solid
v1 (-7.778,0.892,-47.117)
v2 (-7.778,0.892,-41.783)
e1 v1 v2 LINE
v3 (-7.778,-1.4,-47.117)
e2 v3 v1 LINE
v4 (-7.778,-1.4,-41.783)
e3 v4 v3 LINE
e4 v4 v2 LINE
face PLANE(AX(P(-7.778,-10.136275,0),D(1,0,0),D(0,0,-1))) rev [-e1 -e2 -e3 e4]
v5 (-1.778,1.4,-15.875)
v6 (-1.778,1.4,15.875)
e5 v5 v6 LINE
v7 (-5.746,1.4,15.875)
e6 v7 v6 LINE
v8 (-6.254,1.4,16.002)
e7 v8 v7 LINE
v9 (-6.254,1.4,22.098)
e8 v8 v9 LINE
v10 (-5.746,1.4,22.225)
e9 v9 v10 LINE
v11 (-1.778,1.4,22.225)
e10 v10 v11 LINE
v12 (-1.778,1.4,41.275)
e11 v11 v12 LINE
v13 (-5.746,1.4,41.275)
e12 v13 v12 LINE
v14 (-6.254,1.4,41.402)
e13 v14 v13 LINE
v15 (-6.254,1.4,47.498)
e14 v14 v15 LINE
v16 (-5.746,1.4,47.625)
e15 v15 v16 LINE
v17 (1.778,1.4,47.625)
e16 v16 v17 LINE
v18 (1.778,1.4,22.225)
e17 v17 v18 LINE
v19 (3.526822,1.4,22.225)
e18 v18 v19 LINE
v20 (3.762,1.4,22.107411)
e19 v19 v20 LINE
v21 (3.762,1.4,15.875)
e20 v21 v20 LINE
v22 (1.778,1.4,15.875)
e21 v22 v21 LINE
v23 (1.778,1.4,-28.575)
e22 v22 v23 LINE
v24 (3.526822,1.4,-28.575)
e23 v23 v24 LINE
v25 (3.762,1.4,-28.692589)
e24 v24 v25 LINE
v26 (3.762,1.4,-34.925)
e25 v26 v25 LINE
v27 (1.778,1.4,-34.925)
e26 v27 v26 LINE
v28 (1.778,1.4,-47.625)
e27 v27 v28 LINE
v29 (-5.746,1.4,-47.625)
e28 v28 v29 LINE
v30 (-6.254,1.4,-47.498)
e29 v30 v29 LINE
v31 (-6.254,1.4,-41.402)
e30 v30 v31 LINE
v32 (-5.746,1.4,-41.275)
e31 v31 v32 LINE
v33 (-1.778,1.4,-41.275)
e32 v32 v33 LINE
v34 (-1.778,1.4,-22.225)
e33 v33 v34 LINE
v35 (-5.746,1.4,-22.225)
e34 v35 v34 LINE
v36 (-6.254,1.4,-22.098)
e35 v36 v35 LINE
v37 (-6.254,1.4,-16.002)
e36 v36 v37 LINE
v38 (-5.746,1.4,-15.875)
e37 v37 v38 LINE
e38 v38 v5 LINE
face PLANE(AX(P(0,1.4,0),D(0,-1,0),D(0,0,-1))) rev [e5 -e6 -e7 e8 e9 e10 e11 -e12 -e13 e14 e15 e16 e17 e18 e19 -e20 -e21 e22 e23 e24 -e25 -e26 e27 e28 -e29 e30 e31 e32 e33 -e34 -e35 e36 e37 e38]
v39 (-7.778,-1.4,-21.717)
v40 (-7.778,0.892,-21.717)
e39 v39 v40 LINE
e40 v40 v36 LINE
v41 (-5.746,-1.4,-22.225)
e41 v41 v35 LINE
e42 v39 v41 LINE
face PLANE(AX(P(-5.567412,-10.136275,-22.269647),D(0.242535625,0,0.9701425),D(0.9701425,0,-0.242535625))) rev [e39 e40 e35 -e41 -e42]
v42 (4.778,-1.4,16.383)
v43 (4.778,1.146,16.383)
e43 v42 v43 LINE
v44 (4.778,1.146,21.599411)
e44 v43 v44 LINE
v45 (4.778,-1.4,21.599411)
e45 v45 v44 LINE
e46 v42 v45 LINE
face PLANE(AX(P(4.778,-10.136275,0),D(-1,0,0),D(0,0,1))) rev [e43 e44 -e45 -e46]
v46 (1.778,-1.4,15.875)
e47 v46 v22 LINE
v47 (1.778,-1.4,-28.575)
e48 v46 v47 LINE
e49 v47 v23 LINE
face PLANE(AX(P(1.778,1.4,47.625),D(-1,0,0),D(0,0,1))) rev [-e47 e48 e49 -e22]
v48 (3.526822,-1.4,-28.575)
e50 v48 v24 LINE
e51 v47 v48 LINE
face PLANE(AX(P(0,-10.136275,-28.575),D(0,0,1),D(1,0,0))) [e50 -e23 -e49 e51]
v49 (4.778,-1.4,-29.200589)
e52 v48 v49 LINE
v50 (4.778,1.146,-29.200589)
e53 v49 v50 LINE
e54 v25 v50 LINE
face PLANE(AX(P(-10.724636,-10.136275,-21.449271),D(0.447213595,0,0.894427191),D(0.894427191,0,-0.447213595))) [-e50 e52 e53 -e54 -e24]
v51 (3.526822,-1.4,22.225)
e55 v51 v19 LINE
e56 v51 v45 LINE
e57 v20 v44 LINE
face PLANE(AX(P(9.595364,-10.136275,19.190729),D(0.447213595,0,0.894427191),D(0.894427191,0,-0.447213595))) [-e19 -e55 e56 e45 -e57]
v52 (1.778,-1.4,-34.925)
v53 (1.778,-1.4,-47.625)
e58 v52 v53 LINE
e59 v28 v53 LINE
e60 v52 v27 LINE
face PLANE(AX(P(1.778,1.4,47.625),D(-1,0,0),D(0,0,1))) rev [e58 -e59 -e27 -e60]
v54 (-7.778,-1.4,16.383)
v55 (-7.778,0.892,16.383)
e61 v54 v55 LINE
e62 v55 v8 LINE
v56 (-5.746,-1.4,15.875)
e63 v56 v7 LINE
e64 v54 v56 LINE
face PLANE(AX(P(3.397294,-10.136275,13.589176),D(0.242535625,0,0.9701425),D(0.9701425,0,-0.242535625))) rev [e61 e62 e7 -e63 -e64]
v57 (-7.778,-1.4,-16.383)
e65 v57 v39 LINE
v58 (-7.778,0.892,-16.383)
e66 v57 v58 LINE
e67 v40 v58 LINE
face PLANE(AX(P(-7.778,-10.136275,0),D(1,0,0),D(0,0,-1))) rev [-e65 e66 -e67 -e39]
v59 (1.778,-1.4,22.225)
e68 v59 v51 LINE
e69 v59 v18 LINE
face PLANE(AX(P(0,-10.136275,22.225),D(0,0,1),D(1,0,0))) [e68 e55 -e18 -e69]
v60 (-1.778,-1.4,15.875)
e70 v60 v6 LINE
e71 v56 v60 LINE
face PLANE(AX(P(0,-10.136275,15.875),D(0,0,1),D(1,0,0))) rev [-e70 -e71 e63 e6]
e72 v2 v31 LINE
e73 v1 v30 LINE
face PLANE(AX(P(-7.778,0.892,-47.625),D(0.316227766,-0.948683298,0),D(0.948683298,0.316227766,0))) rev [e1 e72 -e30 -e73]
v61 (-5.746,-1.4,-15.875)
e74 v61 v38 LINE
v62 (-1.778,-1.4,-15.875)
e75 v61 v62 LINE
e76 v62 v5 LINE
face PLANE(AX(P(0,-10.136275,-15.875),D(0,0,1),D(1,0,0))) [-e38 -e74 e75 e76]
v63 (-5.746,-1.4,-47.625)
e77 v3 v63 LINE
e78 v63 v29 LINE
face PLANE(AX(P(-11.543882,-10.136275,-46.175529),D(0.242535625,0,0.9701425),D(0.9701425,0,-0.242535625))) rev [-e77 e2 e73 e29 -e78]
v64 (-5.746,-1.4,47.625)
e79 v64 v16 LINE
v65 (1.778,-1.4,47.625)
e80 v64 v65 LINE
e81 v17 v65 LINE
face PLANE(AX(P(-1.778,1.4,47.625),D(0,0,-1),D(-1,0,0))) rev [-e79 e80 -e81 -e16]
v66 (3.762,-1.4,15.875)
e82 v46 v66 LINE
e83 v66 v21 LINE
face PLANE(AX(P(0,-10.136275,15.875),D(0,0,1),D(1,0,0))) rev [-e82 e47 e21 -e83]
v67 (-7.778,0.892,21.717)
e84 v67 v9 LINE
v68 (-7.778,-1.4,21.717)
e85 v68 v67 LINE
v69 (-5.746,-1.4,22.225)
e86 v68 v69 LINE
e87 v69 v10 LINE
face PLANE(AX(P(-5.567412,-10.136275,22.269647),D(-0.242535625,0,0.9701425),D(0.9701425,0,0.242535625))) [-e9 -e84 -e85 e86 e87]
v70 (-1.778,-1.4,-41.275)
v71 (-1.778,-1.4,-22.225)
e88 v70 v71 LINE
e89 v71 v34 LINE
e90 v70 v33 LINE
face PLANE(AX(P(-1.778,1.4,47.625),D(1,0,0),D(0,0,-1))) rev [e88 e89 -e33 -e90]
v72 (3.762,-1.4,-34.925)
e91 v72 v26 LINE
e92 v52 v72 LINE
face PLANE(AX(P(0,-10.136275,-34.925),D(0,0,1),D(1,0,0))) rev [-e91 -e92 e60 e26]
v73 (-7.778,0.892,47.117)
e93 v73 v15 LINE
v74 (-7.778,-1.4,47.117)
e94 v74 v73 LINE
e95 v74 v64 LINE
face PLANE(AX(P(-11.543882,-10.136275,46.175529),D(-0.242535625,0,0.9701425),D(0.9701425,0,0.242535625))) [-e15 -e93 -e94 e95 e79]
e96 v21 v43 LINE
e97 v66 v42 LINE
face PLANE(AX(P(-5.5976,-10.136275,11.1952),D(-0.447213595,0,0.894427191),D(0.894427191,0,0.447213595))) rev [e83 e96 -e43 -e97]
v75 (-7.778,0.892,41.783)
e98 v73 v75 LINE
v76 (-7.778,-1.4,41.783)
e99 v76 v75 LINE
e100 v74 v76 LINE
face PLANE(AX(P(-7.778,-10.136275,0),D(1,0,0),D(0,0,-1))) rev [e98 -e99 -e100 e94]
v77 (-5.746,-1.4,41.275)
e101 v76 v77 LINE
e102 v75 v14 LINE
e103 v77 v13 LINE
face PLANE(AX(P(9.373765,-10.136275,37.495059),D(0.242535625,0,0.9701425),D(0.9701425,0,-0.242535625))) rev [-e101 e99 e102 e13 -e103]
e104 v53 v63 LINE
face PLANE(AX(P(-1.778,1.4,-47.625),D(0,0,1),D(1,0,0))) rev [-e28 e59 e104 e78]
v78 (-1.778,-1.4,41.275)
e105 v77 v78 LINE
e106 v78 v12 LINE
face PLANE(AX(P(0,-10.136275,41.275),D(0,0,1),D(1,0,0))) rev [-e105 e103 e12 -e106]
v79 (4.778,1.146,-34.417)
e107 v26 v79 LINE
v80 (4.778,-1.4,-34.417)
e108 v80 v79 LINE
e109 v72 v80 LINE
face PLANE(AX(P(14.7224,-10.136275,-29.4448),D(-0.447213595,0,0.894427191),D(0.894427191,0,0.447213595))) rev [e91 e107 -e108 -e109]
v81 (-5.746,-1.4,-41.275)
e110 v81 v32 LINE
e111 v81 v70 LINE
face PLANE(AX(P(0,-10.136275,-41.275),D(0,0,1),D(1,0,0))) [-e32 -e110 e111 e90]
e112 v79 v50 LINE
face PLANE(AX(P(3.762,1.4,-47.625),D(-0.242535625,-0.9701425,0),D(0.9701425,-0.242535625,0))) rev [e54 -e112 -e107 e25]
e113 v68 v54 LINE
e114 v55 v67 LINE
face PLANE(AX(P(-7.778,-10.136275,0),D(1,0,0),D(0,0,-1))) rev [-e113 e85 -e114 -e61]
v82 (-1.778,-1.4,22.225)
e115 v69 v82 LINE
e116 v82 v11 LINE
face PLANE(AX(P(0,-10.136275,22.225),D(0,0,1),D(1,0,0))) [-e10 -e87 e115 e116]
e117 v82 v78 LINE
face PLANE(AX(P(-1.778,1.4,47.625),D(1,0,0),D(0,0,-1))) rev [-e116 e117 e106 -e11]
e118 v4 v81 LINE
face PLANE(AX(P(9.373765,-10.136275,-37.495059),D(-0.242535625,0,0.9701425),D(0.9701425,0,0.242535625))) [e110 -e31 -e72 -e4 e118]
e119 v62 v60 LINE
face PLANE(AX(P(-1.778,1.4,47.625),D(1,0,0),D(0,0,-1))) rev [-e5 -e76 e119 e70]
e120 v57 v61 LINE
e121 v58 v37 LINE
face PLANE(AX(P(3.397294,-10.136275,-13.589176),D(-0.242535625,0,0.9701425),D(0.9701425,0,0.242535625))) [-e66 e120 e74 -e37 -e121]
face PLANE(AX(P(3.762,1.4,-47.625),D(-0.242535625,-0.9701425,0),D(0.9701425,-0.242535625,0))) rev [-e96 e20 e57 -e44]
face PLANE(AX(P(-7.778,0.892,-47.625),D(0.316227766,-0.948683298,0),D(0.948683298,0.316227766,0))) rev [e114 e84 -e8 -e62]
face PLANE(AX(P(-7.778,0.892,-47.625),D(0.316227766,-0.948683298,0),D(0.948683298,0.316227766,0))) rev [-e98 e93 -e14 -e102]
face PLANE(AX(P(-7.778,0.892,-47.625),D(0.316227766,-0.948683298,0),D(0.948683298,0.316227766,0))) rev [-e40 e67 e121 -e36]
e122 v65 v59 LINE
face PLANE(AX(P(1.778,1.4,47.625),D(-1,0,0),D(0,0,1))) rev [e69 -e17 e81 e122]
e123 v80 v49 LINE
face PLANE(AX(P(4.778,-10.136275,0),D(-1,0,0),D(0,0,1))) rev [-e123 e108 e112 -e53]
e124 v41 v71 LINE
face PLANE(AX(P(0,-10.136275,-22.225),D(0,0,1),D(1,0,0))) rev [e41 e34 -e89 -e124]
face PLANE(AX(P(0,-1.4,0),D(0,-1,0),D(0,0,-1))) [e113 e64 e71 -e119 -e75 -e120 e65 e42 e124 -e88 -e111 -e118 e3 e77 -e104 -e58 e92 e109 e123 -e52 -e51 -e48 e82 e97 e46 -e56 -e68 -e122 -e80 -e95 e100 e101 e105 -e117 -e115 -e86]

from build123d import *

# Parameters (mm, degrees)
SKETCH1_W               = 3.556
SKETCH1_H               = 95.25
BOSS_EXTRUDE1_DEPTH     = 1.399999994
BOSS_EXTRUDE2_START     = -2.799999988
BOSS_EXTRUDE2_DEPTH     = 2.799999988
CUT_EXTRUDE1_DEPTH      = 96.57729743
CUT_EXTRUDE1_DEPTH_BACK = 96.57729743


# Read off the part's stored shape, not the designer's step: Boss-Extrude2
with BuildPart() as part:
    # Sketch1 → Boss-Extrude1 (new, symmetric)
    with BuildSketch(Plane(origin=(0, 0, 0), x_dir=(1, 0, 0), z_dir=(0, 1, 0))):
        Rectangle(SKETCH1_W, SKETCH1_H)
    extrude(amount=BOSS_EXTRUDE1_DEPTH, both=True)

    # Boss-Extrude2 outline → Boss-Extrude2 (add)
    with BuildSketch(Plane(origin=(0, 1.399999994, 0), x_dir=(1, 0, 0), z_dir=(0, 1, 0)).offset(BOSS_EXTRUDE2_START)):
        Polygon((-1.778, 47.625), (-5.746, 47.625), (-7.778, 47.117), (-7.778, 41.783), (-5.746, 41.275), (-1.778, 41.275), align=None)
        Polygon((3.762000096, 34.925), (1.778, 34.925), (1.778, 28.575), (3.526821698, 28.575), (4.778000096, 29.200589199), (4.778000096, 34.417), align=None)
        Polygon((-1.778, 15.875), (-1.778, 22.225), (-5.746, 22.225), (-7.778, 21.717), (-7.778, 16.383), (-5.746, 15.875), align=None)
        Polygon((3.762000096, -15.875), (1.778, -15.875), (1.778, -22.225), (3.526821698, -22.225), (4.778000096, -21.599410801), (4.778000096, -16.383), align=None)
        Polygon((-1.778, -22.225), (-1.778, -15.875), (-5.746, -15.875), (-7.778, -16.383), (-7.778, -21.717), (-5.746, -22.225), align=None)
        Polygon((-1.778, -47.625), (-1.778, -41.275), (-5.746, -41.275), (-7.778, -41.783), (-7.778, -47.117), (-5.746, -47.625), align=None)
    extrude(amount=BOSS_EXTRUDE2_DEPTH)

    # Sketch3 → Cut-Extrude1 (cut, two sides: drawn at the far end of the back side and taken through both)
    with BuildSketch(Plane.XY.offset(47.625).offset(-CUT_EXTRUDE1_DEPTH_BACK)):
        Polygon((-7.778, 0.891999994), (-6.254, 1.399999994), (-7.778, 1.399999994), align=None)
        Polygon((4.778000096, 1.145999994), (4.778000096, 1.399999994), (3.762000096, 1.399999994), align=None)
    extrude(amount=CUT_EXTRUDE1_DEPTH + CUT_EXTRUDE1_DEPTH_BACK, mode=Mode.SUBTRACT)


solid = part.part
